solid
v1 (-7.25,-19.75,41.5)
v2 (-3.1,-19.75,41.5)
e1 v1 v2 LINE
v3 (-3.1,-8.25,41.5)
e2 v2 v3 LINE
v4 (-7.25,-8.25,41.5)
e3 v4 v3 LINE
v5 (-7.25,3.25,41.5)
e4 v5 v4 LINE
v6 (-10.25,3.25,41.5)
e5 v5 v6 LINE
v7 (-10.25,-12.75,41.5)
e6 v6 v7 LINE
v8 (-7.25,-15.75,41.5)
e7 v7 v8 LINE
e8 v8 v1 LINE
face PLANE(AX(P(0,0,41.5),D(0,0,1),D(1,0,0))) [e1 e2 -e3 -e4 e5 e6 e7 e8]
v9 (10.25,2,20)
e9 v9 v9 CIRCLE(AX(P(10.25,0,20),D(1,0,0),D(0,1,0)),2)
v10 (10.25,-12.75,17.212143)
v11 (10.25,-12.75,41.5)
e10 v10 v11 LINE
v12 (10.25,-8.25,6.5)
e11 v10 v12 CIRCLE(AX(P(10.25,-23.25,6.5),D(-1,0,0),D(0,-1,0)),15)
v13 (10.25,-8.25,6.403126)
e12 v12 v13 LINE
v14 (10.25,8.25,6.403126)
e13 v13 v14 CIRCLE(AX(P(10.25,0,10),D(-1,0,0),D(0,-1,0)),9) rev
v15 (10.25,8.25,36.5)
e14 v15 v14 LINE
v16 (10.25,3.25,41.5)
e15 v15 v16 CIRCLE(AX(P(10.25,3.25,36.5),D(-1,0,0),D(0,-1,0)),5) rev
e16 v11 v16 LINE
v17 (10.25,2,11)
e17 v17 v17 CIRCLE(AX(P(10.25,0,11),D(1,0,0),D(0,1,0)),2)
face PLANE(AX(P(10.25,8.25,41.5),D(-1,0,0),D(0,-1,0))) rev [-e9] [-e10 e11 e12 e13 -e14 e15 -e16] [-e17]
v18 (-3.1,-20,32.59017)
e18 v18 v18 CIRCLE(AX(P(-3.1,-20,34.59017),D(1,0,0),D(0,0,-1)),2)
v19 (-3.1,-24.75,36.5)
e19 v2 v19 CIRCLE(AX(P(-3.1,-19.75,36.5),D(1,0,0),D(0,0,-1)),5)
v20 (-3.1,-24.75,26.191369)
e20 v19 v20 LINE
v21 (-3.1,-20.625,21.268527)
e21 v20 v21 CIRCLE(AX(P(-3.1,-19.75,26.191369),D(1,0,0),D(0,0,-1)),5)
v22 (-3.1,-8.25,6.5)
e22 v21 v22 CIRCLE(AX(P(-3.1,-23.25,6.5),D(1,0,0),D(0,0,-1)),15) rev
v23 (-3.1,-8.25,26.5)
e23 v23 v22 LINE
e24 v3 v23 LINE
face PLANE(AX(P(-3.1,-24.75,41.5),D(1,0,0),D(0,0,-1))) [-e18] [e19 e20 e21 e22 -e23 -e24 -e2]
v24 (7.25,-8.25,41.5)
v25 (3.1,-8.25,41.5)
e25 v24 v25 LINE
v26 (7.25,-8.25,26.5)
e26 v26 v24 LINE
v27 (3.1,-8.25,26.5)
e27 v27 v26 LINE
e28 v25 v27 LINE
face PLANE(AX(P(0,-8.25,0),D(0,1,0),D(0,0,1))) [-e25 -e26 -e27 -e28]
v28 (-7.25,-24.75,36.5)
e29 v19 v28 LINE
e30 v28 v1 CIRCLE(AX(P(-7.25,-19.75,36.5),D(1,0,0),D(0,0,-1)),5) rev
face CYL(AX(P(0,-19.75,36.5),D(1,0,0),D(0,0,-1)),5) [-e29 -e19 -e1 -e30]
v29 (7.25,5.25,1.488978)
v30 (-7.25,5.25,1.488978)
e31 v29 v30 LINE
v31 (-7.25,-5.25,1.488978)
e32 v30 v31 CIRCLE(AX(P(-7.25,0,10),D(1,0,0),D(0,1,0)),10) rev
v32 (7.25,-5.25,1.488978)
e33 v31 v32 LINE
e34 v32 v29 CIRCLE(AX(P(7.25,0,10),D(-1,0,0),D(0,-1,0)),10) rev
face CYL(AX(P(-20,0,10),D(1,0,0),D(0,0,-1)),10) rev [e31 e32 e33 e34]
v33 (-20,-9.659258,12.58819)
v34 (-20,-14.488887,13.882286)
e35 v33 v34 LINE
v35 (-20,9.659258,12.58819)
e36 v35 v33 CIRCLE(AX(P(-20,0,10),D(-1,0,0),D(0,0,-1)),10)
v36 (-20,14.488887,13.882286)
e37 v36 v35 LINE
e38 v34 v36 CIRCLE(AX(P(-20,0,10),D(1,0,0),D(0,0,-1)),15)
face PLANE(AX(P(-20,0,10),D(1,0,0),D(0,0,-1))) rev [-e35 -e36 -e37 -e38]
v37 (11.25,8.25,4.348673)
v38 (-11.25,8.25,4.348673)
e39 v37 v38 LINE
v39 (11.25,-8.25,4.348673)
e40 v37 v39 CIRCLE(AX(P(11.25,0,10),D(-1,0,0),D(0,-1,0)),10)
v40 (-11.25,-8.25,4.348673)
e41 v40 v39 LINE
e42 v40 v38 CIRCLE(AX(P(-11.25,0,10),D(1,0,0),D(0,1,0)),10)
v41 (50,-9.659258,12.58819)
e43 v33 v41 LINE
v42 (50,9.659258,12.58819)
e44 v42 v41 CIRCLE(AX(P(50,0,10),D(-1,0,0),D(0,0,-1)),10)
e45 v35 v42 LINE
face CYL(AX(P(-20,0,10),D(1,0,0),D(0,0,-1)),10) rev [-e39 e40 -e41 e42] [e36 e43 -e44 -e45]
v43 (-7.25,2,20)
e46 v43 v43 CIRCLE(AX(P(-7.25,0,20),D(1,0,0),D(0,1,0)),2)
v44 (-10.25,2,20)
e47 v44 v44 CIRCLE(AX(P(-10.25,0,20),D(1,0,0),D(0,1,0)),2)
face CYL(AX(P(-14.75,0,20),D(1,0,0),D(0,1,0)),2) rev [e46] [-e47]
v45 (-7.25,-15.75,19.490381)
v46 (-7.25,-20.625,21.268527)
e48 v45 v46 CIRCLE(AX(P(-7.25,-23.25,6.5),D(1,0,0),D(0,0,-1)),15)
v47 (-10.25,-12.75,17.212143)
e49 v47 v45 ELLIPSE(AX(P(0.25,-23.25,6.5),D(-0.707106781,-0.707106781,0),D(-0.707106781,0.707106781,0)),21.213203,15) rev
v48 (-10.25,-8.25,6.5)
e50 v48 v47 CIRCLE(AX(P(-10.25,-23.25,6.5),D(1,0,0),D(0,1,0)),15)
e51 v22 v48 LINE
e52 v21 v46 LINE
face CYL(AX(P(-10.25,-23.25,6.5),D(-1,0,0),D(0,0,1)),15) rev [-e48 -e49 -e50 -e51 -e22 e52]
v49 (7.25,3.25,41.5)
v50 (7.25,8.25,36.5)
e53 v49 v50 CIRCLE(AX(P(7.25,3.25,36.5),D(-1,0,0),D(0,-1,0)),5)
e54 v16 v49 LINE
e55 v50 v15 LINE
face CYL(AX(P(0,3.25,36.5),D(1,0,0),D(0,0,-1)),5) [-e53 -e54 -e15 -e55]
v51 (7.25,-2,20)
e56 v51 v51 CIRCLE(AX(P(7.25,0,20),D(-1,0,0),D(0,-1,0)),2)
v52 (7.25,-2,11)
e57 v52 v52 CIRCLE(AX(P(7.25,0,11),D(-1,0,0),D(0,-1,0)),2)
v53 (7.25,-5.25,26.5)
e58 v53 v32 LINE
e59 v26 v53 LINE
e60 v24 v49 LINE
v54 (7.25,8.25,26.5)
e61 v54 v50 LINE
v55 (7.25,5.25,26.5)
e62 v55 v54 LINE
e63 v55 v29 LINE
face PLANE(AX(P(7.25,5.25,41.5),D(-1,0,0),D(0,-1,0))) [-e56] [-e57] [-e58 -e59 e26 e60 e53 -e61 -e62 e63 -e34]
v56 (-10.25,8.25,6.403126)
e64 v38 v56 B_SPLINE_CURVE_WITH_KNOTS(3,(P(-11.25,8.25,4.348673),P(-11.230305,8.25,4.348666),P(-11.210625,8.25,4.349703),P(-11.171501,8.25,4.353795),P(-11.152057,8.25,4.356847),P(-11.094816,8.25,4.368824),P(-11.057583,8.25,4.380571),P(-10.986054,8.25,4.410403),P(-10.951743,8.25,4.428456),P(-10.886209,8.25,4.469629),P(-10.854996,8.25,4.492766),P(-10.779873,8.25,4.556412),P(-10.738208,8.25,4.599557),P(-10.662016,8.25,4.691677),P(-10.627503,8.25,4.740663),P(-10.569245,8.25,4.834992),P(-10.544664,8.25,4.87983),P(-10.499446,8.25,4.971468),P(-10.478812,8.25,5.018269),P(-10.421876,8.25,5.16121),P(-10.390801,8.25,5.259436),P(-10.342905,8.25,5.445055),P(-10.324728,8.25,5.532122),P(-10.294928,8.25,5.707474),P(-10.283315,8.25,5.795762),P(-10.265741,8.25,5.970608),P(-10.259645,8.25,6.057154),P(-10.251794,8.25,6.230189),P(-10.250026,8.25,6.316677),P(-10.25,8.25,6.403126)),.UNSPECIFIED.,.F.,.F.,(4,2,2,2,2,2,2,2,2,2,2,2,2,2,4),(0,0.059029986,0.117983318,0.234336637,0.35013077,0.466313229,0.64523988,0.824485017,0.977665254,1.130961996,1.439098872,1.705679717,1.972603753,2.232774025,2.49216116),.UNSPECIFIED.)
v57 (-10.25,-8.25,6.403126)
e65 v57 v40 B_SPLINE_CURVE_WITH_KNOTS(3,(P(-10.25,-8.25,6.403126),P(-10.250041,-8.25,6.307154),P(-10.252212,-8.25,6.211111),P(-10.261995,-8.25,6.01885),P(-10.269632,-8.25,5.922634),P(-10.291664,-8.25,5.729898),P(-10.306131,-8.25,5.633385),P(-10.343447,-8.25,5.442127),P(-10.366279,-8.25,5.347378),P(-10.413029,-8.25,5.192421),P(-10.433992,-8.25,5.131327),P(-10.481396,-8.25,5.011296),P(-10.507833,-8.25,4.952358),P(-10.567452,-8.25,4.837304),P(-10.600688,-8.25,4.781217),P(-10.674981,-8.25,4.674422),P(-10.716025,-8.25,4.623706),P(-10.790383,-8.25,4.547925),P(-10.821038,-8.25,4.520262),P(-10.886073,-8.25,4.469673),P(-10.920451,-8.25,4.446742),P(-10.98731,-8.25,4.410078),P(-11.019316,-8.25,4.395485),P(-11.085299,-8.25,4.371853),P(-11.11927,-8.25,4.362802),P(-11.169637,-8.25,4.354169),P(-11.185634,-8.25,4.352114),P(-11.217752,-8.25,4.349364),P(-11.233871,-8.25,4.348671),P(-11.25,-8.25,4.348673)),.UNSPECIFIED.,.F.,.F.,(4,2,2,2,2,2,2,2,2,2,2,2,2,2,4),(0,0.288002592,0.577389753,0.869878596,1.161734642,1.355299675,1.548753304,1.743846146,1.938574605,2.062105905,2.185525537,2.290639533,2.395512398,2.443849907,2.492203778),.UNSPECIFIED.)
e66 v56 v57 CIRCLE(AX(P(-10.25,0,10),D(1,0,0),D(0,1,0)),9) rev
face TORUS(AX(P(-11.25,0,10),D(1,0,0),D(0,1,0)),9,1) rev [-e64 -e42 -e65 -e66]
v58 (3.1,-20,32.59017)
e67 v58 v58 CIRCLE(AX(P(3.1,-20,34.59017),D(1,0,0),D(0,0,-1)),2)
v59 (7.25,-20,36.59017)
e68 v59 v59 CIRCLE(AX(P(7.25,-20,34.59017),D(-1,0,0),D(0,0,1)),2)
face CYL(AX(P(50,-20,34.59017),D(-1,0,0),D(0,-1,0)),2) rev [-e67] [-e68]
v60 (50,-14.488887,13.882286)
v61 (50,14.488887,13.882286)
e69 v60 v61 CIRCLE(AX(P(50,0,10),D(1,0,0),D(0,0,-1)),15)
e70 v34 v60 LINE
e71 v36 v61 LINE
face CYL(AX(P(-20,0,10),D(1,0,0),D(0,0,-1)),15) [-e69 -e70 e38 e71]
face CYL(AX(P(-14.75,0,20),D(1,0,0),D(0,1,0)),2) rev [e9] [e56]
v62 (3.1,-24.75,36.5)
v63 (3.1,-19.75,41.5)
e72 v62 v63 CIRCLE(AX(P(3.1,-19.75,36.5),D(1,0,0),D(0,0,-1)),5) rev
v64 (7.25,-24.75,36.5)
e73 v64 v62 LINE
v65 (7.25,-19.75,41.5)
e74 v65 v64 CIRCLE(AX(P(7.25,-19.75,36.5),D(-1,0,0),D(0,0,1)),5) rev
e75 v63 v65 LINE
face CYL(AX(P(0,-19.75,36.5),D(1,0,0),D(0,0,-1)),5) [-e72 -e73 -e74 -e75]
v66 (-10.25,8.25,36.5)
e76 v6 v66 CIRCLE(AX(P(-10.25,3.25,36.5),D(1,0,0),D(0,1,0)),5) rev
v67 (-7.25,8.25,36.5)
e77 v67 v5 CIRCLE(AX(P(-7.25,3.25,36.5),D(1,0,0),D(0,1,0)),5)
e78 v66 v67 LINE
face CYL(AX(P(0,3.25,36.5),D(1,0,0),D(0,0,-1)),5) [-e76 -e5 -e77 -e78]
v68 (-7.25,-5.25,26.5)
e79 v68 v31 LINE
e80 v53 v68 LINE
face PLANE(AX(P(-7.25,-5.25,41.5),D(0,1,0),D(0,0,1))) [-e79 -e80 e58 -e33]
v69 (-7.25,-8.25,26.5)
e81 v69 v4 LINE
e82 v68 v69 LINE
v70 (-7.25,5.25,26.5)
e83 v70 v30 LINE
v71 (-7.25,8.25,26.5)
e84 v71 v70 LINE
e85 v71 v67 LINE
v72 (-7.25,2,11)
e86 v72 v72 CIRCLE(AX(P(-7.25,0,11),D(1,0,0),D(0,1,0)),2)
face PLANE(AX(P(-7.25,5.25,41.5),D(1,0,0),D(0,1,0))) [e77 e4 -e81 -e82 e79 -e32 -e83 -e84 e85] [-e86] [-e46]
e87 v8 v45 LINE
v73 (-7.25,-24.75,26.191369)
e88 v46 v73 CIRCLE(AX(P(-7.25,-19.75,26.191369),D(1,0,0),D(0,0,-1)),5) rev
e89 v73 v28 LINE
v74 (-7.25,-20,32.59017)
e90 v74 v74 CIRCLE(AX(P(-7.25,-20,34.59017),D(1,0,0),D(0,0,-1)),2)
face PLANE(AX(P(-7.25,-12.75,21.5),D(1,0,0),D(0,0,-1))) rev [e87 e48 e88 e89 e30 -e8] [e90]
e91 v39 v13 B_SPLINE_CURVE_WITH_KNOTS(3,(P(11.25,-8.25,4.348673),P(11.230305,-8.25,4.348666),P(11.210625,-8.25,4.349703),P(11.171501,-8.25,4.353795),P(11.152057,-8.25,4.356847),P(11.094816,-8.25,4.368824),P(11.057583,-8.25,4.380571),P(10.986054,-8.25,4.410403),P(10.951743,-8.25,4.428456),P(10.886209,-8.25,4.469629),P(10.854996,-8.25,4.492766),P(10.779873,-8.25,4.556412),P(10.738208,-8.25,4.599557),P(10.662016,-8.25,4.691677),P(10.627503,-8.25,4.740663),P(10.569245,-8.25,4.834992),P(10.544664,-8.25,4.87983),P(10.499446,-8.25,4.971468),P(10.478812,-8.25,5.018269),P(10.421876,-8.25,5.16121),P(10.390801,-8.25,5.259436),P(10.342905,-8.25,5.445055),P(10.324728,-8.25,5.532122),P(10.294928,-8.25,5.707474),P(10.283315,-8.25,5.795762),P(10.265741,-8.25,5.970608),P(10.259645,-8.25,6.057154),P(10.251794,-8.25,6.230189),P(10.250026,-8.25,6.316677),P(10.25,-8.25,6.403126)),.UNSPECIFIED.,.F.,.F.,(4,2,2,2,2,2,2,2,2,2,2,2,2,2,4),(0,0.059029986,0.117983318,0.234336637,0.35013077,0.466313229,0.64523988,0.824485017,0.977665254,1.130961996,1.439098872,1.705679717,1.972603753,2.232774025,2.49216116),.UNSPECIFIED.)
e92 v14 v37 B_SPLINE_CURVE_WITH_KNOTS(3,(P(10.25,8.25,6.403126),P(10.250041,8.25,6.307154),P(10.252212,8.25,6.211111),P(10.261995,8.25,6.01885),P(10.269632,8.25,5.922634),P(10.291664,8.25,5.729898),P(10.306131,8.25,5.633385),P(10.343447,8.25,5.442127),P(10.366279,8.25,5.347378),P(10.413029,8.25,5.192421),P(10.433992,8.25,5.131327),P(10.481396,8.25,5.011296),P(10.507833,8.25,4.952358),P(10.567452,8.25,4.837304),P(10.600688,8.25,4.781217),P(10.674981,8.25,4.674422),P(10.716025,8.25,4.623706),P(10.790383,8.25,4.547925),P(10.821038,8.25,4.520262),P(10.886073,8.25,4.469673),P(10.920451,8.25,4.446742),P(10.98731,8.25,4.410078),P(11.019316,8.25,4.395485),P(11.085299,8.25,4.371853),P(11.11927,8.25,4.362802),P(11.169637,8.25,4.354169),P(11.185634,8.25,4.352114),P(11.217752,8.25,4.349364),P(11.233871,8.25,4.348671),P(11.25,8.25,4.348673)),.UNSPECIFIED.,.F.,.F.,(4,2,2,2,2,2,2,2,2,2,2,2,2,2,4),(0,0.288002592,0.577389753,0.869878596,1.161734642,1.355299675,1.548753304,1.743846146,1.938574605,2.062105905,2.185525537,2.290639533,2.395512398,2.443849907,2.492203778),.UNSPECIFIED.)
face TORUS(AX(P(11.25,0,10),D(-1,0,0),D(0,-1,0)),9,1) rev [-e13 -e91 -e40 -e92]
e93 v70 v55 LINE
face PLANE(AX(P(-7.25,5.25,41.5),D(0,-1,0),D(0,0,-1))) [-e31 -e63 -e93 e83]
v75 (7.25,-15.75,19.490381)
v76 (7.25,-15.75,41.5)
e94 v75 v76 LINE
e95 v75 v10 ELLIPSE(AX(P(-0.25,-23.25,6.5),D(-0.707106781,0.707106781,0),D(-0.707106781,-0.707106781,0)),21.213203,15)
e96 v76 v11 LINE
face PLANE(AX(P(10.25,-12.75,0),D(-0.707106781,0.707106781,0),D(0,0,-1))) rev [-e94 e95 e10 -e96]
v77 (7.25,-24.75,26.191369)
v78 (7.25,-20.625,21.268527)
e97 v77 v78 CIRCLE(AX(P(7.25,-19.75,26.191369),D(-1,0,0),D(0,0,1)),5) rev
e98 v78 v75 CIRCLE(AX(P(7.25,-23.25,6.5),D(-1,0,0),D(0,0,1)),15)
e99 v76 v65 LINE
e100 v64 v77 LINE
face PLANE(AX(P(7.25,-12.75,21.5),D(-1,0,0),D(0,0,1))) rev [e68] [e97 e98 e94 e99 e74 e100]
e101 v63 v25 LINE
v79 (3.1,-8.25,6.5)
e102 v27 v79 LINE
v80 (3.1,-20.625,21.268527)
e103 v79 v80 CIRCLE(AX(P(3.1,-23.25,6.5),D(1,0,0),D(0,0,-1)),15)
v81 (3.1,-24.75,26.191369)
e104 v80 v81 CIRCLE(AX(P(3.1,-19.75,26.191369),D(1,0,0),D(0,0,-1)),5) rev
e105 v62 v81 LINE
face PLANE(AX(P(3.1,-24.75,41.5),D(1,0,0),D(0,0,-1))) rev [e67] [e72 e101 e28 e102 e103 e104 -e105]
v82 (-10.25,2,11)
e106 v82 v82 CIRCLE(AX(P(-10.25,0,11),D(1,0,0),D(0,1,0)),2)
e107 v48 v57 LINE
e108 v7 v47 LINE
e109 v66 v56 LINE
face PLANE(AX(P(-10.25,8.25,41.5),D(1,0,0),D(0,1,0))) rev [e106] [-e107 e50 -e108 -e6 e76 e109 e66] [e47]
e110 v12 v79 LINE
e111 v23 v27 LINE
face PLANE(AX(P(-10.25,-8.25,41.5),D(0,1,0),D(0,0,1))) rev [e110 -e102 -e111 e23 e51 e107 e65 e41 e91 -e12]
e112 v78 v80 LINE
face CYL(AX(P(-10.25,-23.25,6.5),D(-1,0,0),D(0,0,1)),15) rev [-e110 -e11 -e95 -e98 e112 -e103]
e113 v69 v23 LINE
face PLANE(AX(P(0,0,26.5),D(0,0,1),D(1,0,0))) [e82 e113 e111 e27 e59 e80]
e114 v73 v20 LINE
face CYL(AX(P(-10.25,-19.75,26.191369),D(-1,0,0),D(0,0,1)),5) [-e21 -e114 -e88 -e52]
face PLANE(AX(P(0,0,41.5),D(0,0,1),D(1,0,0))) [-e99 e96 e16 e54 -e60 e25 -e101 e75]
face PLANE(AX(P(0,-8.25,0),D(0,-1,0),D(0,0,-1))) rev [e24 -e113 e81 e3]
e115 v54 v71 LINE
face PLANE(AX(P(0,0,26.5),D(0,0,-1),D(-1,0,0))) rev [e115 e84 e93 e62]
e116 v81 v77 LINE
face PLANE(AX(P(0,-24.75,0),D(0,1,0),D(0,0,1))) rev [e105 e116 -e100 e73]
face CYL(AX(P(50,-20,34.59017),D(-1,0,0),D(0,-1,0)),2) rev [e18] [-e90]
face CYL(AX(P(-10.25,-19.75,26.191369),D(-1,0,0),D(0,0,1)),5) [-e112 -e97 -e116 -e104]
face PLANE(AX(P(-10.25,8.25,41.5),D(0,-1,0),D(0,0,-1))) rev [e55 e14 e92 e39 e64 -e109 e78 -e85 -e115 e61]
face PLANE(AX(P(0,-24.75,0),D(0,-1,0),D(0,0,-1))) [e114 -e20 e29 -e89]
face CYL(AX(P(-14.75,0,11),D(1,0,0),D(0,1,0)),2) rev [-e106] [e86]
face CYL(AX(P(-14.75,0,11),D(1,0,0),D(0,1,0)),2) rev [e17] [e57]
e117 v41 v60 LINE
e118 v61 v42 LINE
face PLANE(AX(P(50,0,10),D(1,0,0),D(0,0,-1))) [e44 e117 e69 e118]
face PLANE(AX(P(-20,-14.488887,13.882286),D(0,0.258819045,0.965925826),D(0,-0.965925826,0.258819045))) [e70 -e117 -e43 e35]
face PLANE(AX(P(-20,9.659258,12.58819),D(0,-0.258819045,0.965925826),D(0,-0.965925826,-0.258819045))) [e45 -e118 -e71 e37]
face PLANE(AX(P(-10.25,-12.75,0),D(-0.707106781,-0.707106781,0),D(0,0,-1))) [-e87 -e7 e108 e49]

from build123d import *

# Parameters (mm, degrees)
SKETCH1_W                = 20.5
SKETCH1_H                = 16.5
SKETCH1_W_2              = 14.5
SKETCH1_H_2              = 10.5
BOSS_EXTRUDE1_DEPTH      = 41.5
SKETCH2_W                = 14.5
SKETCH2_H                = 3
CUT_EXTRUDE1_DEPTH       = 15
BOSS_EXTRUDE2_DEPTH      = 50
BOSS_EXTRUDE2_DEPTH_BACK = 20
SKETCH5_R                = 2
CUT_EXTRUDE2_DEPTH       = 25
SKETCH12_W               = 7.15
SKETCH12_H               = 20
BOSS_EXTRUDE16_DEPTH     = 16.5
SKETCH13_W               = 3
SKETCH13_H               = 20
CUT_EXTRUDE5_DEPTH       = 12
CHAMFER1_SIZE            = 3
FILLET6_R                = 15
FILLET7_R                = 5
SKETCH7_R                = 2
CUT_EXTRUDE6_DEPTH       = 78.232603305
FILLET14_R               = 1


with BuildPart() as part:
    # Sketch1 → Boss-Extrude1 (new body)
    with BuildSketch(Plane.XY):
        Rectangle(SKETCH1_W, SKETCH1_H)
        Rectangle(SKETCH1_W_2, SKETCH1_H_2, mode=Mode.SUBTRACT)
    extrude(amount=BOSS_EXTRUDE1_DEPTH)

    # Sketch2 → Cut-Extrude1 (cut)
    with BuildSketch(Plane.XY.offset(41.5)):
        with Locations((0, 6.75)):
            Rectangle(SKETCH2_W, SKETCH2_H)
        with Locations((0, -6.75)):
            Rectangle(SKETCH2_W, SKETCH2_H)
    extrude(amount=-CUT_EXTRUDE1_DEPTH, mode=Mode.SUBTRACT)

    # Sketch3 → Boss-Extrude2 (add, two sides: drawn at the far end of the back side and taken through both)
    with BuildSketch(Plane(origin=(0, 0, 0), x_dir=(0, 0, -1), z_dir=(1, 0, 0)).offset(-BOSS_EXTRUDE2_DEPTH_BACK)):
        with BuildLine():
            Line((-13.882285677, -14.488887394), (-12.588190451, -9.659258263))
            ThreePointArc((-12.588190451, -9.659258263), (0, 0), (-12.588190451, 9.659258263))
            Line((-12.588190451, 9.659258263), (-13.882285677, 14.488887394))
            ThreePointArc((-13.882285677, 14.488887394), (5, 0), (-13.882285677, -14.488887394))
        make_face()
    extrude(amount=BOSS_EXTRUDE2_DEPTH + BOSS_EXTRUDE2_DEPTH_BACK)

    # Sketch5 → Cut-Extrude2 (cut)
    with BuildSketch(Plane(origin=(10.25, 0, 0), x_dir=(0, 0, -1), z_dir=(1, 0, 0))):
        with Locations(Location((-20, 0, 0), (0, 0, 90))):
            Circle(SKETCH5_R)
        with Locations(Location((-11, 0, 0), (0, 0, 90))):
            Circle(SKETCH5_R)
    extrude(amount=-CUT_EXTRUDE2_DEPTH, mode=Mode.SUBTRACT)

    # Sketch12 → Boss-Extrude16 (add)
    with BuildSketch(Plane.XZ.offset(8.25)):
        with Locations((-6.675, 31.5)):
            Rectangle(SKETCH12_W, SKETCH12_H)
        with Locations((6.675, 31.5)):
            Rectangle(SKETCH12_W, SKETCH12_H)
    extrude(amount=BOSS_EXTRUDE16_DEPTH)

    # Sketch13 → Cut-Extrude5 (cut)
    with BuildSketch(Plane.XZ.offset(24.75)):
        with Locations((-8.75, 31.5)):
            Rectangle(SKETCH13_W, SKETCH13_H)
        with Locations((8.75, 31.5)):
            Rectangle(SKETCH13_W, SKETCH13_H)
    extrude(amount=-CUT_EXTRUDE5_DEPTH, mode=Mode.SUBTRACT)

    # Chamfer1
    chamfer1_edges = [part.edges().sort_by_distance(p)[0] for p in [
        (7.25, -12.75, 31.5),
        (-7.25, -12.75, 31.5),
    ]]
    chamfer(chamfer1_edges, length=CHAMFER1_SIZE - 0.0001)  # a hair under: the kernel refuses the full size

    # Fillet6
    fillet6_edges = [part.edges().sort_by_distance(p)[0] for p in [
        (6.675, -8.25, 21.5),
        (-6.675, -8.25, 21.5),
    ]]
    fillet(fillet6_edges, radius=FILLET6_R)

    # Fillet7
    fillet7_edges = [part.edges().sort_by_distance(p)[0] for p in [
        (8.75, 8.25, 41.5),
        (-8.75, 8.25, 41.5),
        (5.175, -24.75, 21.5),
        (5.175, -24.75, 41.5),
        (-5.175, -24.75, 41.5),
        (-5.175, -24.75, 21.5),
    ]]
    fillet(fillet7_edges, radius=FILLET7_R)

    # Sketch7 → Cut-Extrude6 (cut, through all)
    with BuildSketch(Plane.ZY.offset(10.25)):
        with Locations(Location((34.590169944, -20, 0), (0, 0, 180))):
            Circle(SKETCH7_R)
    extrude(amount=-CUT_EXTRUDE6_DEPTH, mode=Mode.SUBTRACT)

    # Fillet14
    fillet14_edges = [part.edges().sort_by_distance(p)[0] for p in [
        (10.25, 0, 0),
        (-10.25, 0, 0),
    ]]
    fillet(fillet14_edges, radius=FILLET14_R)


solid = part.part
